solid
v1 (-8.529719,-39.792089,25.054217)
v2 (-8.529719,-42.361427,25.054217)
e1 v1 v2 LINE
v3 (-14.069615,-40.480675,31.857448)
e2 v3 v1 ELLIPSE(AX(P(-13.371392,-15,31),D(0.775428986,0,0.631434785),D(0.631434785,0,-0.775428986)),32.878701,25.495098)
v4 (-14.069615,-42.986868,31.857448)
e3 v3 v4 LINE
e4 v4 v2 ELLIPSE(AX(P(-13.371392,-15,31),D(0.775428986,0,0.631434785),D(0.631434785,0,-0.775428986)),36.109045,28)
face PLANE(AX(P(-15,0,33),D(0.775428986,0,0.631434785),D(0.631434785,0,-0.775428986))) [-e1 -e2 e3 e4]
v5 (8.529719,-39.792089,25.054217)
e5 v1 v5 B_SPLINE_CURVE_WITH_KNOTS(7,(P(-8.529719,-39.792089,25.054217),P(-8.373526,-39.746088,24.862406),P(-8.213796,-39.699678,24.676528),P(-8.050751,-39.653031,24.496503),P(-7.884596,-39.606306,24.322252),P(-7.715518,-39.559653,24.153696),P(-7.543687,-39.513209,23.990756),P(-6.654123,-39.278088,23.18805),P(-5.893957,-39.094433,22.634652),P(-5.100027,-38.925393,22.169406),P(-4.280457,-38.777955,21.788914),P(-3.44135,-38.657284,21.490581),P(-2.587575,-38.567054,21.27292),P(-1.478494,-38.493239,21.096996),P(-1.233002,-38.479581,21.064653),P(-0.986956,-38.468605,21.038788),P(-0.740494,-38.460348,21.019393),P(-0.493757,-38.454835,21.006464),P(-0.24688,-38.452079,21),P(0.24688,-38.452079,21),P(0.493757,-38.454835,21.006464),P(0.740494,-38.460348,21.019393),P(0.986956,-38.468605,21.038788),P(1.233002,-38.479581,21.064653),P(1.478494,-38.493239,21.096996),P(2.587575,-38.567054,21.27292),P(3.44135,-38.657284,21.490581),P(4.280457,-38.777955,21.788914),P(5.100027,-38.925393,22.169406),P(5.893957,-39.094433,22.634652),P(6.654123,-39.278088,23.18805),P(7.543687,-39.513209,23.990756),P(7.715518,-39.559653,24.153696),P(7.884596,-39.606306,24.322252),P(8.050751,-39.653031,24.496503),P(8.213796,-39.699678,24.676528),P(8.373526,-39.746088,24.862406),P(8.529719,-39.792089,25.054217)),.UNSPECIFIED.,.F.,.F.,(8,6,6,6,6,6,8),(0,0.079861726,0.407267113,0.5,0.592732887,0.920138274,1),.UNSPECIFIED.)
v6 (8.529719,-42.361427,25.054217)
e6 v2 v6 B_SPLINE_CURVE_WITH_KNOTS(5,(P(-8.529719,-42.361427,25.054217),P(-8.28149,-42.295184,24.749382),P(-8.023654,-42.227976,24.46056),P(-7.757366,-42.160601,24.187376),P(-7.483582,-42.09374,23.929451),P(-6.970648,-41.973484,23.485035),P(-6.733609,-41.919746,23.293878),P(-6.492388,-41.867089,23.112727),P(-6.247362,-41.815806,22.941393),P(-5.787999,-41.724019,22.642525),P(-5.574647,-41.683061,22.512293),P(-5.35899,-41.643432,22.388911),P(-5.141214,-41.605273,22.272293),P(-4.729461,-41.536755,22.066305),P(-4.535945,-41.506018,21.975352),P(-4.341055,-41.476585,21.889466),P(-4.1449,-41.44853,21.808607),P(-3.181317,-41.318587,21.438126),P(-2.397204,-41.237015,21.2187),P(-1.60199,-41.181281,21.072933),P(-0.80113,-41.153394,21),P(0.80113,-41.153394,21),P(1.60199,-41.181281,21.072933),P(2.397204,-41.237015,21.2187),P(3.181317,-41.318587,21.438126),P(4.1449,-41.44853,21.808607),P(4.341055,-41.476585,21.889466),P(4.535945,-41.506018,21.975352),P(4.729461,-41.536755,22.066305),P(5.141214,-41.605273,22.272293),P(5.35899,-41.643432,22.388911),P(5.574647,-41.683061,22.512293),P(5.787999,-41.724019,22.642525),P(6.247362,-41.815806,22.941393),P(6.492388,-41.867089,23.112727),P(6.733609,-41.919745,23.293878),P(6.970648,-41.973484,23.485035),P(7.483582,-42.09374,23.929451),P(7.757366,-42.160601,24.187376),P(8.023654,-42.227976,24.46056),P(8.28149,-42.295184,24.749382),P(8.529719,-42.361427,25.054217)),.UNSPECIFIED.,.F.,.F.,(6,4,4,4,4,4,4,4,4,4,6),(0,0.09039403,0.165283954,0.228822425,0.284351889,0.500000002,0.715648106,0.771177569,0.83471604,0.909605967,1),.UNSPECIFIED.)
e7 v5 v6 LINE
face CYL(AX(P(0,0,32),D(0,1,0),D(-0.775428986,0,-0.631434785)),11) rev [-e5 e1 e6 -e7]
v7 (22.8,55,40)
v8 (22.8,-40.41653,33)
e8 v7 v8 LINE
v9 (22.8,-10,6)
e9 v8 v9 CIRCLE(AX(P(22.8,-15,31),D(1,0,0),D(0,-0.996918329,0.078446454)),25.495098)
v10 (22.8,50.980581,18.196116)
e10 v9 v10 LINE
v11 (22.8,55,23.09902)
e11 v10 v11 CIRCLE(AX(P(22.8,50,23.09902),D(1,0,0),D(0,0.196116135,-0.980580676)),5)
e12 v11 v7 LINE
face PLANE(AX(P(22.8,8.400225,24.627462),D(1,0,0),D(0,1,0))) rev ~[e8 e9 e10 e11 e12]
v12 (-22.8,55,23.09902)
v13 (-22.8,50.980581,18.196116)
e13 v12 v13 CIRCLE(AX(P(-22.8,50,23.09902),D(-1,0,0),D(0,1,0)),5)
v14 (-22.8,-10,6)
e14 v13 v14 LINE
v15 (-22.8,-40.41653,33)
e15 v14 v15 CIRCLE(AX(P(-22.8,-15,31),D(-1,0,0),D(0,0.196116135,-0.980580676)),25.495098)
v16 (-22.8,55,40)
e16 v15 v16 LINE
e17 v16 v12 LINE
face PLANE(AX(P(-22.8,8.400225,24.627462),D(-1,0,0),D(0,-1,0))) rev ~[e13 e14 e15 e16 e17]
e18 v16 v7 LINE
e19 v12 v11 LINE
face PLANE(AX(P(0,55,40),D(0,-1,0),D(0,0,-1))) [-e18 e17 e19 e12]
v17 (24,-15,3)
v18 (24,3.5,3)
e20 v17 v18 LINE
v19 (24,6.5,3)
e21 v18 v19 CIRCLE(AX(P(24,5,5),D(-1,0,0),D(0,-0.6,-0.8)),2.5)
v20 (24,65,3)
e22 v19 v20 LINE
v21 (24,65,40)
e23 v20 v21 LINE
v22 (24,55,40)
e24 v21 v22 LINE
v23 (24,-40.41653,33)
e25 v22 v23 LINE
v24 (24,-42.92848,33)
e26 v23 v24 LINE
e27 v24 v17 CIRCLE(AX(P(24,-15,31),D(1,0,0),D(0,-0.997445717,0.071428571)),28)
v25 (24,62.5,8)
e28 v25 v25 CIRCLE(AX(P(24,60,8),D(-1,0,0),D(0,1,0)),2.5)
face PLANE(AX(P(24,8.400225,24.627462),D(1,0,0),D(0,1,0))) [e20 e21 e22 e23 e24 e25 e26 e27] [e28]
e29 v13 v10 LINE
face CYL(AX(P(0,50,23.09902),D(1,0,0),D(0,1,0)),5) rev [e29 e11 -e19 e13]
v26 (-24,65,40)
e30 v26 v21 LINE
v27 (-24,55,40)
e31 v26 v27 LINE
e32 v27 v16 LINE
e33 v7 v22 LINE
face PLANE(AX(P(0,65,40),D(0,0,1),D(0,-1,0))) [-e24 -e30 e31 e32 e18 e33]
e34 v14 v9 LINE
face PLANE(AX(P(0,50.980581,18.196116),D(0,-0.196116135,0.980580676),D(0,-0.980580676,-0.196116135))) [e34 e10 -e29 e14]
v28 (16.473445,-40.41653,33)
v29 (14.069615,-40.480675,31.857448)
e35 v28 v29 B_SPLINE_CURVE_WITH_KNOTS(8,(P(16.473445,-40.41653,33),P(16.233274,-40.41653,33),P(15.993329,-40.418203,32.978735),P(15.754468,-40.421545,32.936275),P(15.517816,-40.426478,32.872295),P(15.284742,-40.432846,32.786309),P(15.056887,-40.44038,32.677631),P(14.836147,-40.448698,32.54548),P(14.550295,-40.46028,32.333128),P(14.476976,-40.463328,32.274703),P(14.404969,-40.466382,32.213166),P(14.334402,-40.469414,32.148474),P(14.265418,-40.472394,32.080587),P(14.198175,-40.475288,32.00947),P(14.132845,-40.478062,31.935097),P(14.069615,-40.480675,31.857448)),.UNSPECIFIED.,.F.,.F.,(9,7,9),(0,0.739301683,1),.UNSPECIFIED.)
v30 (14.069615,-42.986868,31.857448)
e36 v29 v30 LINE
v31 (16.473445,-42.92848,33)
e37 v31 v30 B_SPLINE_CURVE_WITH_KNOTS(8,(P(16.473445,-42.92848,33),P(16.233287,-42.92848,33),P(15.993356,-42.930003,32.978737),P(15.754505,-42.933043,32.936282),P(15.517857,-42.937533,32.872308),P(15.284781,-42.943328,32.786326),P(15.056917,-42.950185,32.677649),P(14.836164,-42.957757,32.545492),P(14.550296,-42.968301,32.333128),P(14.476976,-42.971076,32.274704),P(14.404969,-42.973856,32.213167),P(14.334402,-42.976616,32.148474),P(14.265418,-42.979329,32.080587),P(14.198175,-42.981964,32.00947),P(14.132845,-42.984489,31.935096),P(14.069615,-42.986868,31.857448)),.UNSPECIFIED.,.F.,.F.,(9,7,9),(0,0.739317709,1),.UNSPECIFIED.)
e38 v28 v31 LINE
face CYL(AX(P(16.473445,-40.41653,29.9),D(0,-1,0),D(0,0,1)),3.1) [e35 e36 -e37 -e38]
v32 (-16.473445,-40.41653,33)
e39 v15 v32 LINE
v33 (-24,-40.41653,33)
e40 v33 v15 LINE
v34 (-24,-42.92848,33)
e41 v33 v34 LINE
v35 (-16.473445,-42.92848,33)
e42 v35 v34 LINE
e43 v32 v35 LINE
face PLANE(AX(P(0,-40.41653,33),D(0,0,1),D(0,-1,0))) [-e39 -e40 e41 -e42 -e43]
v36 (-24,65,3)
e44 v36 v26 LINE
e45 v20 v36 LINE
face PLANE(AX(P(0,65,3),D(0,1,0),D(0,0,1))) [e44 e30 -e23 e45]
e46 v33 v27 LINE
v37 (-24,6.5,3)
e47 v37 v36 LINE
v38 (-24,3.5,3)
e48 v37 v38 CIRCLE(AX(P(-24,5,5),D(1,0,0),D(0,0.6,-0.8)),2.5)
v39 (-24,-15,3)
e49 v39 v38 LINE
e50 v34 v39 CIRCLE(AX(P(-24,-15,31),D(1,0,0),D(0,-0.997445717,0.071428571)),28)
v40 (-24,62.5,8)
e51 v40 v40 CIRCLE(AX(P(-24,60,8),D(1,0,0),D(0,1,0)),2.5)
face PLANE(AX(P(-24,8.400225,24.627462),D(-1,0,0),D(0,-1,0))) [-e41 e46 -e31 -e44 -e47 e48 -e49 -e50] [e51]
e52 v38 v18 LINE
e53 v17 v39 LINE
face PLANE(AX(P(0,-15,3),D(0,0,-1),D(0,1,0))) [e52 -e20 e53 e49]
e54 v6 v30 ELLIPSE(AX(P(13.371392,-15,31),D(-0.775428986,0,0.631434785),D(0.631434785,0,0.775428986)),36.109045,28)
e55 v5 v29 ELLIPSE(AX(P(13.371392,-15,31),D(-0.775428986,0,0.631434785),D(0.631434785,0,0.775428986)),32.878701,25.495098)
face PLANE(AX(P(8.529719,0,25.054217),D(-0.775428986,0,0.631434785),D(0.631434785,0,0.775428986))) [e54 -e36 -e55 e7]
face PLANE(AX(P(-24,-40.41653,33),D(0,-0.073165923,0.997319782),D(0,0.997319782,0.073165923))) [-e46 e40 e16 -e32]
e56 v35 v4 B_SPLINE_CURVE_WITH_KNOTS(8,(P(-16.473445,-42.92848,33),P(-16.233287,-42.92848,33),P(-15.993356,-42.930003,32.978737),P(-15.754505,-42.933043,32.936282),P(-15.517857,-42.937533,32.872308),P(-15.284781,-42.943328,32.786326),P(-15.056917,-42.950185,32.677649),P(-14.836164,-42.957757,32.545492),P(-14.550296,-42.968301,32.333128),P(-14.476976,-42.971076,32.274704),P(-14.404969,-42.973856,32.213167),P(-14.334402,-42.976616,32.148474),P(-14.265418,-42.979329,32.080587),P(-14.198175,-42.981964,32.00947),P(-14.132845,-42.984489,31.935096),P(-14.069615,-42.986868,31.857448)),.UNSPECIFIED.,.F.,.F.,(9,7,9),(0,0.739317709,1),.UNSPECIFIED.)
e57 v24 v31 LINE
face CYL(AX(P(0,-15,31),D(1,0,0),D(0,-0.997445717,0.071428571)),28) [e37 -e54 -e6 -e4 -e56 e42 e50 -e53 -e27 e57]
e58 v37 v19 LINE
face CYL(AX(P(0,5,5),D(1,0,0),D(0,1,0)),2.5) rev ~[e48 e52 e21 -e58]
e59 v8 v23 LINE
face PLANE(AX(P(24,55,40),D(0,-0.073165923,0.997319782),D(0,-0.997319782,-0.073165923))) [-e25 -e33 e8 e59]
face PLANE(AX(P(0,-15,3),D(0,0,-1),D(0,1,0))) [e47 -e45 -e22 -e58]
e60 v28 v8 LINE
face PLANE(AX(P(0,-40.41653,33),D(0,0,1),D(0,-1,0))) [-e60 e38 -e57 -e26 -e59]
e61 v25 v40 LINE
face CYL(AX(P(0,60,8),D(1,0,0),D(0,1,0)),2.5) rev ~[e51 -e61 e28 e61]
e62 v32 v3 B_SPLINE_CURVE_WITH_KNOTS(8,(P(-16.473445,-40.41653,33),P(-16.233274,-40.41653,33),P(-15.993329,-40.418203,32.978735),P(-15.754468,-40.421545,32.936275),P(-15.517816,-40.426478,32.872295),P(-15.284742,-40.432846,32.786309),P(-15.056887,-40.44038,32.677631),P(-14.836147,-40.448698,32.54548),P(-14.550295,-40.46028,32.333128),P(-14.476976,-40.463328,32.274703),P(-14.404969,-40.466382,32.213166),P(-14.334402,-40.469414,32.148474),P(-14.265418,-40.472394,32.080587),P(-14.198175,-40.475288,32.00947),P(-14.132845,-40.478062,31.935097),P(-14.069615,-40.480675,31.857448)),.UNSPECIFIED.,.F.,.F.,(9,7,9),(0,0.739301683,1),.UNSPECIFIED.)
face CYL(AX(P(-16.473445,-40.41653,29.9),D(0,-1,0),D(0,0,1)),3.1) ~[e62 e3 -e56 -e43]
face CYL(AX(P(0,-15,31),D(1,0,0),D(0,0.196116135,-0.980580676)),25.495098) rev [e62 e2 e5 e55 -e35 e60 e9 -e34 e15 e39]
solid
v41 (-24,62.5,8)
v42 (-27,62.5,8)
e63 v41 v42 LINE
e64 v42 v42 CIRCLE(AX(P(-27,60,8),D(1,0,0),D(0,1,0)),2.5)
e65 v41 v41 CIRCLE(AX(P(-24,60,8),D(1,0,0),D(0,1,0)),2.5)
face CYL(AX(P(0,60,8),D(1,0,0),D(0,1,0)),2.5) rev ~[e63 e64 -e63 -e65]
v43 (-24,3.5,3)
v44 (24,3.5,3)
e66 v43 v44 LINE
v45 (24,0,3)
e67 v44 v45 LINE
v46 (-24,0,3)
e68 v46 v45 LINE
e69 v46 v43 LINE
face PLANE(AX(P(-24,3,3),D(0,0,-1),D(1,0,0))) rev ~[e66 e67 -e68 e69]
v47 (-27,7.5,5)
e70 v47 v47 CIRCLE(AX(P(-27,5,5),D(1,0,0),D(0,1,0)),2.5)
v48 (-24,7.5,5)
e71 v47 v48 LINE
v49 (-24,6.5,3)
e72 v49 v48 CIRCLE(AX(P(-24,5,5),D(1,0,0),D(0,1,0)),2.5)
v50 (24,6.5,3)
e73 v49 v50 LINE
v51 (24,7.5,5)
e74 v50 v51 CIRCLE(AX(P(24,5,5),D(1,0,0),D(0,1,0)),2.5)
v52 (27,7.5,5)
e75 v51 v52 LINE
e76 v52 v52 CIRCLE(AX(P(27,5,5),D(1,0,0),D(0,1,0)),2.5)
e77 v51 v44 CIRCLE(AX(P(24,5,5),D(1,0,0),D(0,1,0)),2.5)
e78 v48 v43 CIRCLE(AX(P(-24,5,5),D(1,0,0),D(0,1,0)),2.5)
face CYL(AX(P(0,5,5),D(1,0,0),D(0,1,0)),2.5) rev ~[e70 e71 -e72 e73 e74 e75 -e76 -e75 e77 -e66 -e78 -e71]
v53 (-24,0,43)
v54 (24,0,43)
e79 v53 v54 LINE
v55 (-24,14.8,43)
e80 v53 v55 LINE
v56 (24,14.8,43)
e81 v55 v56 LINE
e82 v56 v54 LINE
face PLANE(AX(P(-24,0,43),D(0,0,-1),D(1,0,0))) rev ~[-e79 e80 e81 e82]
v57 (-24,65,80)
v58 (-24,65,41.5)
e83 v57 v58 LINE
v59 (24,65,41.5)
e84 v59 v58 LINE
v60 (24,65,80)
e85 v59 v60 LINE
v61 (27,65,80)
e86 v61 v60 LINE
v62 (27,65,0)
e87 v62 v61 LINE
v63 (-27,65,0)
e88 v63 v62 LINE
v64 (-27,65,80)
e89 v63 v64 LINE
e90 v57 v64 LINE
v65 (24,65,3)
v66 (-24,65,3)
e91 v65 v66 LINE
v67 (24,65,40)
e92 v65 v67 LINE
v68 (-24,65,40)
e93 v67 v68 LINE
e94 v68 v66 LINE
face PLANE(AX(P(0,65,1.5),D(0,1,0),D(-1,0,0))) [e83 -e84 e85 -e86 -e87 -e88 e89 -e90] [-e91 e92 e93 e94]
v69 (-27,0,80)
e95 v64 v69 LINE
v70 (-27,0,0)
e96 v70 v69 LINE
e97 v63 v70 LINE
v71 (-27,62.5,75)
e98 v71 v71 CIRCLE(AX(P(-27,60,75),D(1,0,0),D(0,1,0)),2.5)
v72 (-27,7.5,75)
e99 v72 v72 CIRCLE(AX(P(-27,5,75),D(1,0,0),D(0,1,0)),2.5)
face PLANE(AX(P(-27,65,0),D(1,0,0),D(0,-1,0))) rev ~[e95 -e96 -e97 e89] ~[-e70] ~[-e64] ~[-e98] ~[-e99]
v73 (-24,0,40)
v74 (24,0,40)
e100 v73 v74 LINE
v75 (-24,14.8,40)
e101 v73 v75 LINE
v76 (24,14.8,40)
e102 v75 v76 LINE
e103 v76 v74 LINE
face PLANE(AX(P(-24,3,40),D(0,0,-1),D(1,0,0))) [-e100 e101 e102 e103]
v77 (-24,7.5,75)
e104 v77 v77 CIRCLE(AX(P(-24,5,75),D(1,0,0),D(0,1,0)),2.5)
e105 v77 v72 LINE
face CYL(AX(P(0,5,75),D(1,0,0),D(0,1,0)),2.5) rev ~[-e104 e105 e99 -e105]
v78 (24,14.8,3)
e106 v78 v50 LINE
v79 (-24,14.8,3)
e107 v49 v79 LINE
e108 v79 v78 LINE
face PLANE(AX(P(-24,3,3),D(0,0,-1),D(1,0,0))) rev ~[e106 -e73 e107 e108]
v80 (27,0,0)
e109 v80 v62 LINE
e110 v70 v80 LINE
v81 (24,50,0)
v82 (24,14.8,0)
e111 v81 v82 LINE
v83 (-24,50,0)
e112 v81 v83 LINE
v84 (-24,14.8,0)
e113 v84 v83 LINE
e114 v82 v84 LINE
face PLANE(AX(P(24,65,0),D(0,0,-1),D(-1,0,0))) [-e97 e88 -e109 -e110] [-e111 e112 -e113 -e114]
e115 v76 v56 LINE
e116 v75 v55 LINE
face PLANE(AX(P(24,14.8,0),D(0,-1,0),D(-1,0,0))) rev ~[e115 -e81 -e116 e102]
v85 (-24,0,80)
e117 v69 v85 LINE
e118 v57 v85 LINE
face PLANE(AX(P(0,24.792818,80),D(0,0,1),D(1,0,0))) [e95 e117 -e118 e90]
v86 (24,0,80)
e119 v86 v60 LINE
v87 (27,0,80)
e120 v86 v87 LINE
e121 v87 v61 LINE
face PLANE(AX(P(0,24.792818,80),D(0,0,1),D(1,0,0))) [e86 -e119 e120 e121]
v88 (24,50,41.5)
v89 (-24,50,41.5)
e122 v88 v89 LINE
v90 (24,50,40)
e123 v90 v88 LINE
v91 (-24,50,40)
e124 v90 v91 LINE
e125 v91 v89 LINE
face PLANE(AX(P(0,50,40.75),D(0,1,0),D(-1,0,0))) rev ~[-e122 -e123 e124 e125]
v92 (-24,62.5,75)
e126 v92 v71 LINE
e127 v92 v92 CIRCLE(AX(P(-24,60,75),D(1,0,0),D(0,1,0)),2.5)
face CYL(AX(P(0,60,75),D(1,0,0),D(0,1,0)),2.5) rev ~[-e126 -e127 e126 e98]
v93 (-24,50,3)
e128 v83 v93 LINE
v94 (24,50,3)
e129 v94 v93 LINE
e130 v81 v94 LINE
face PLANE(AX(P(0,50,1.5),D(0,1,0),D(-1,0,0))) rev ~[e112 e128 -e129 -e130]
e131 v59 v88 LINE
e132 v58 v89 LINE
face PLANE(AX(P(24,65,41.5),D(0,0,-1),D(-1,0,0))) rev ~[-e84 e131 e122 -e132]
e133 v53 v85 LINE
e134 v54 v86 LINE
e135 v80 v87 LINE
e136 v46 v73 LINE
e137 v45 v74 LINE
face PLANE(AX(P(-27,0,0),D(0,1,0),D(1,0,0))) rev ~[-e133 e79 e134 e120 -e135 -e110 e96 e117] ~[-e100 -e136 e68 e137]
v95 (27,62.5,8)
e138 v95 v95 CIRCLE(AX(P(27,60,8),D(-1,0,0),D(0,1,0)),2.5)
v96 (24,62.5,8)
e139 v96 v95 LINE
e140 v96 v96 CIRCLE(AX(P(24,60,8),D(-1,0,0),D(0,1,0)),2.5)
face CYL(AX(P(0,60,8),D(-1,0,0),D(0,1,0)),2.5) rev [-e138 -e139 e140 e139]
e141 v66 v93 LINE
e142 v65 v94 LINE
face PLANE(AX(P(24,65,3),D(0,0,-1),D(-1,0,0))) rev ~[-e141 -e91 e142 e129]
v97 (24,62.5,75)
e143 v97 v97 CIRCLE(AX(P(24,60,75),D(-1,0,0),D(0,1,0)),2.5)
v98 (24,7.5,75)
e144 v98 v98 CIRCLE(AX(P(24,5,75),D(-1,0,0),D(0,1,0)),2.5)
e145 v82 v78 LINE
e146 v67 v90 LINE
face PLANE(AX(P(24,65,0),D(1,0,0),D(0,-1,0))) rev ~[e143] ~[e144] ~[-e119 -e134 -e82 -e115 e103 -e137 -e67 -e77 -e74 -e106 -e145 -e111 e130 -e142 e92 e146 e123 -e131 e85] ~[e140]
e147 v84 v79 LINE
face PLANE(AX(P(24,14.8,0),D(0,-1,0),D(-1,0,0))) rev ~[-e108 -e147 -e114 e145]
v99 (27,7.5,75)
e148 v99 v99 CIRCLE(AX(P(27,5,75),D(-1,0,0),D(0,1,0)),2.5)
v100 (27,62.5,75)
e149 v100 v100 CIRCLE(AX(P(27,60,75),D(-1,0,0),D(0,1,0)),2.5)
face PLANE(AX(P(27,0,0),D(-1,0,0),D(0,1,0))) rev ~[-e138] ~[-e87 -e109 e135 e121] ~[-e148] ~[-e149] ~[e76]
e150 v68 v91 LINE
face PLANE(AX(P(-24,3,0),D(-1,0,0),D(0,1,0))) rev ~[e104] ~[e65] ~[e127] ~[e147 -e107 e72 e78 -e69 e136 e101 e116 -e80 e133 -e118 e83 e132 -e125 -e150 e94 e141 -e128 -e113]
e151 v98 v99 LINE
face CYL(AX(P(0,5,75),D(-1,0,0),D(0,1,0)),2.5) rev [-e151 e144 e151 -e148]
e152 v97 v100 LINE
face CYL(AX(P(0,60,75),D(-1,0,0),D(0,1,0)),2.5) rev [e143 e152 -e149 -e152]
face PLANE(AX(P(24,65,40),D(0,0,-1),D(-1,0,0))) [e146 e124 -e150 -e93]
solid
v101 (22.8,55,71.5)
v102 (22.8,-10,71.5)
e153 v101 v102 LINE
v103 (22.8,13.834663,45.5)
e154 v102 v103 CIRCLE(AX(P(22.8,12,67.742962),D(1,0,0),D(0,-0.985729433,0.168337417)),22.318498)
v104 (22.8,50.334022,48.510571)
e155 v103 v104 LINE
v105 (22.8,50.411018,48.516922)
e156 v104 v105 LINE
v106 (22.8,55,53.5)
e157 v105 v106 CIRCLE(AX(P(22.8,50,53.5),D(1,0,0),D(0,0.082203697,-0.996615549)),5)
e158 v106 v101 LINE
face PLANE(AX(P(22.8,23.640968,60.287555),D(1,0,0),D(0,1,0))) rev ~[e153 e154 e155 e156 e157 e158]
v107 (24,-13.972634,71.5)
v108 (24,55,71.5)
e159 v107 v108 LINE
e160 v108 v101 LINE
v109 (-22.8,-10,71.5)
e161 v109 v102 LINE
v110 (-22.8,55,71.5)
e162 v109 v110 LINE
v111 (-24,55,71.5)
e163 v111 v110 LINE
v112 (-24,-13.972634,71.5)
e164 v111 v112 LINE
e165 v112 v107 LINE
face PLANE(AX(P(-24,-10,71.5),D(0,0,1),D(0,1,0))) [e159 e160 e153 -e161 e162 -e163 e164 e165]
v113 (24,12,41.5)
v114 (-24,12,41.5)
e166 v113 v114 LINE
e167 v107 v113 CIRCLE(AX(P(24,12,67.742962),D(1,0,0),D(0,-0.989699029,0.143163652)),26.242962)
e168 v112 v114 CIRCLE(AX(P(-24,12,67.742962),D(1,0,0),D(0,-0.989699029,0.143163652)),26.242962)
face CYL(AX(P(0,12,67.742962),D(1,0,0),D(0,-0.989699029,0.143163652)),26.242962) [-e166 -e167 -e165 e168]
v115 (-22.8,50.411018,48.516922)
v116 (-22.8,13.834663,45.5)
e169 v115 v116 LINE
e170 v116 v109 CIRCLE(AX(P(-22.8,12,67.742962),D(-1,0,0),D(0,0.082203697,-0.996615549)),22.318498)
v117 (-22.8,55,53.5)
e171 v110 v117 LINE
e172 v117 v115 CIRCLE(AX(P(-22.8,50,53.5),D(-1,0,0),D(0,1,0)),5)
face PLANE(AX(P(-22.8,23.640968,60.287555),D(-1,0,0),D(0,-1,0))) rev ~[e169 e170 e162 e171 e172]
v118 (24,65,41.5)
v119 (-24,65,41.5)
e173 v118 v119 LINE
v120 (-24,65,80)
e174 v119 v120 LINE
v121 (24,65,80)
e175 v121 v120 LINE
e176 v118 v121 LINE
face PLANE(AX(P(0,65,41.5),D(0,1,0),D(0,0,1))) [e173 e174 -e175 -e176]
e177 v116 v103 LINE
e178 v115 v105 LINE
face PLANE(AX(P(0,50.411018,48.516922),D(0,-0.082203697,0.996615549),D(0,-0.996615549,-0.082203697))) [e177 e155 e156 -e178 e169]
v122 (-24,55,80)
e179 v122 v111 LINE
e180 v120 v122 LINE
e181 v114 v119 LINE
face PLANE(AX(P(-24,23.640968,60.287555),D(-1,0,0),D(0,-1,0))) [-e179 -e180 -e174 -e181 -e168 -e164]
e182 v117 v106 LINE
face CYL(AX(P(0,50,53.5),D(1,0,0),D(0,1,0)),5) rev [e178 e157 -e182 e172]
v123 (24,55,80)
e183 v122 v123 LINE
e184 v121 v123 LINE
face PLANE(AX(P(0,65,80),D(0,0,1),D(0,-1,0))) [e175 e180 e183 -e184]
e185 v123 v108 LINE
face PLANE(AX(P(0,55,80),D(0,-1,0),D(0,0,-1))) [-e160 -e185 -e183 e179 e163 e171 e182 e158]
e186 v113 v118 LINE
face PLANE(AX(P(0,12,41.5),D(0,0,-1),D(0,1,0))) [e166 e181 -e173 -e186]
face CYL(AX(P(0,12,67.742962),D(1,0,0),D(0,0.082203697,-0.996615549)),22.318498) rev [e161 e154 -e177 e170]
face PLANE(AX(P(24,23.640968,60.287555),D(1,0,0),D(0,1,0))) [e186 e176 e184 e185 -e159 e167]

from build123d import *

# Parameters (mm, degrees)
F1_DEPTH  = 80
F2_W      = 48
F2_H      = 37
F3_DEPTH  = 65.001
F4_DEPTH  = 11.8
F5_W      = 48
F5_H      = 3
F6_DEPTH  = 15
F7_DEPTH  = 11.8
F8_W      = 48
F8_H      = 1.5
F9_DEPTH  = 15
F11_DEPTH = 24
F12_R     = 2.5
F13_DEPTH = 30
F15_DEPTH = 43.001
F16_R     = 3.1
F18_DEPTH = 1.2
F20_DEPTH = 1.2
F22_DEPTH = 24
F24_DEPTH = 1.2
F26_DEPTH = 1.2


# Not quite as in the source:
# - a feature names something its author has since deleted; it is built from what else it names


with BuildPart() as f1:
    # F0 (on Top) → F1 (new body)
    with BuildSketch(Plane.XY):
        Polygon((-24, 65), (-27, 65), (-27, 0), (27, 0), (27, 65), (24, 65), (24, 3), (-24, 3), align=None)
    extrude(amount=F1_DEPTH)

    # F2 (on face) → F3 (cut, through all)
    with BuildSketch(Plane.XZ):
        with Locations((0, 21.5)):
            Rectangle(F2_W, F2_H)
        with Locations((0, 61.5)):
            Rectangle(F2_W, F2_H)
    extrude(amount=-F3_DEPTH, mode=Mode.SUBTRACT)

    # F4 (add): a face of the model
    f4_faces = [f1.faces().sort_by_distance(p)[0] for p in [
        (0, 3, 1.5),
    ]]
    extrude(f4_faces, amount=F4_DEPTH)

    # F5 (on face) → F6 (join)
    with BuildSketch(Plane(origin=(0, 65, 0), x_dir=(-1, 0, 0), z_dir=(0, 1, 0))):
        with Locations((0, 1.5)):
            Rectangle(F5_W, F5_H)
    extrude(amount=-F6_DEPTH)

    # F7 (add, through all): a face of the model
    f7_faces = [f1.faces().sort_by_distance(p)[0] for p in [
        (0, 3, 41.5),
    ]]
    extrude(f7_faces, amount=F7_DEPTH)

    # F8 (on face) → F9 (join)
    with BuildSketch(Plane(origin=(0, 65, 0), x_dir=(-1, 0, 0), z_dir=(0, 1, 0))):
        with Locations((0, 40.75)):
            Rectangle(F8_W, F8_H)
    extrude(amount=-F9_DEPTH)


with BuildPart() as f11:
    # F10 (on Right) → F11 (new body, symmetric)
    with BuildSketch(Plane.YZ):
        with BuildLine():
            Line((65, 3), (65, 21))
            Line((65, 21), (65, 40))
            Line((65, 40), (55, 40))
            Line((55, 40), (55, 23.0990195136))
            ThreePointArc((55, 23.0990195136), (53.8667107067, 19.9290749856), (50.9805806757, 18.1961161351))
            Line((50.9805806757, 18.1961161351), (-10, 6))
            ThreePointArc((-10, 6), (-31.9250900991, 11.9332403084), (-40.4165300543, 33))
            Line((-40.4165300543, 33), (-42.9284800875, 33))
            ThreePointArc((-42.9284800875, 33), (-35.4939015319, 11.9212159717), (-15, 3))
            Line((-15, 3), (55, 3))
            Line((55, 3), (65, 3))
        make_face()
    extrude(amount=F11_DEPTH, both=True)


with BuildPart() as f13_tool:
    # F12 (on Right) → F13 (new body, symmetric)
    with BuildSketch(Plane.YZ):
        with Locations((60, 75)):
            Circle(F12_R)
        with Locations((60, 8)):
            Circle(F12_R)
        with Locations((5, 75)):
            Circle(F12_R)
        with Locations((5, 5)):
            Circle(F12_R)
    extrude(amount=F13_DEPTH, both=True)


with BuildPart() as f1_1:
    add(f1.part)

    # F13: cut by f13_tool
    add(f13_tool.part, mode=Mode.SUBTRACT)


with BuildPart() as f11_1:
    add(f11.part)

    # F13: cut by f13_tool
    add(f13_tool.part, mode=Mode.SUBTRACT)

    # F14 (on Front) → F15 (cut, through all)
    with BuildSketch(Plane.XZ):
        with BuildLine():
            Line((-15, 33), (-8.5297188426, 25.0542173611))
            ThreePointArc((-8.5297188426, 25.0542173611), (0, 21), (8.5297188426, 25.0542173611))
            Line((8.5297188426, 25.0542173611), (15, 33))
            Line((15, 33), (-15, 33))
        make_face()
    extrude(amount=F15_DEPTH, mode=Mode.SUBTRACT)

    # F16
    f16_edges = [f11_1.edges().sort_by_distance(p)[0] for p in [
        (-15, -41.672505, 33),
        (15, -41.672505, 33),
    ]]
    fillet(f16_edges, radius=F16_R)

    # F17 (on face) → F18 (join)
    with BuildSketch(Plane.YZ.offset(24)):
        with BuildLine():
            ThreePointArc((-40.4165300543, 33), (-31.9250900991, 11.9332403084), (-10, 6))
            Line((-10, 6), (50.9805806757, 18.1961161351))
            ThreePointArc((50.9805806757, 18.1961161351), (53.8667107067, 19.9290749856), (55, 23.0990195136))
            Line((55, 23.0990195136), (55, 40))
            Line((55, 40), (-40.4165300543, 33))
        make_face()
    extrude(amount=-F18_DEPTH)

    # F19 (on face) → F20 (join)
    with BuildSketch(Plane(origin=(-24, 0, 0), x_dir=(0, -1, 0), z_dir=(-1, 0, 0))):
        with BuildLine():
            ThreePointArc((-55, 23.0990195136), (-53.8667107067, 19.9290749856), (-50.9805806757, 18.1961161351))
            Line((-50.9805806757, 18.1961161351), (10, 6))
            ThreePointArc((10, 6), (31.9250900991, 11.9332403084), (40.4165300543, 33))
            Line((40.4165300543, 33), (-55, 40))
            Line((-55, 40), (-55, 23.0990195136))
        make_face()
    extrude(amount=-F20_DEPTH)


with BuildPart() as f22:
    # F21 (on Right) → F22 (new body, symmetric)
    with BuildSketch(Plane.YZ):
        with BuildLine():
            Line((65, 80), (55, 80))
            Line((55, 80), (55, 53.5))
            ThreePointArc((55, 53.5), (53.677981268, 50.1128989103), (50.4110184832, 48.5169222556))
            Line((50.4110184832, 48.5169222556), (13.8346630084, 45.5))
            ThreePointArc((13.8346630084, 45.5), (-4.4517538274, 52.6613460558), (-10, 71.5))
            Line((-10, 71.5), (-13.9726337853, 71.5))
            ThreePointArc((-13.9726337853, 71.5), (-7.8404744509, 50.5659825278), (12, 41.5))
            Line((12, 41.5), (65, 41.5))
            Line((65, 41.5), (65, 80))
        make_face()
    extrude(amount=F22_DEPTH, both=True)

    # F23 (on face) → F24 (join)
    with BuildSketch(Plane.YZ.offset(24)):
        with BuildLine():
            Line((55, 71.5), (-10, 71.5))
            ThreePointArc((-10, 71.5), (-4.4517538274, 52.6613460558), (13.8346630084, 45.5))
            Line((13.8346630084, 45.5), (50.3340224507, 48.510571403))
            Line((50.3340224507, 48.510571403), (50.4110184832, 48.5169222556))
            ThreePointArc((50.4110184832, 48.5169222556), (53.677981268, 50.1128989103), (55, 53.5))
            Line((55, 53.5), (55, 71.5))
        make_face()
    extrude(amount=-F24_DEPTH)

    # F25 (on face) → F26 (join)
    with BuildSketch(Plane(origin=(-24, 0, 0), x_dir=(0, -1, 0), z_dir=(-1, 0, 0))):
        with BuildLine():
            ThreePointArc((-13.8346630084, 45.5), (4.4517538274, 52.6613460558), (10, 71.5))
            Line((10, 71.5), (-55, 71.5))
            Line((-55, 71.5), (-55, 53.5))
            ThreePointArc((-55, 53.5), (-53.677981268, 50.1128989103), (-50.4110184832, 48.5169222556))
            Line((-50.4110184832, 48.5169222556), (-13.8346630084, 45.5))
        make_face()
    extrude(amount=-F26_DEPTH)


solid = Compound([f1_1.part, f11_1.part, f22.part])
